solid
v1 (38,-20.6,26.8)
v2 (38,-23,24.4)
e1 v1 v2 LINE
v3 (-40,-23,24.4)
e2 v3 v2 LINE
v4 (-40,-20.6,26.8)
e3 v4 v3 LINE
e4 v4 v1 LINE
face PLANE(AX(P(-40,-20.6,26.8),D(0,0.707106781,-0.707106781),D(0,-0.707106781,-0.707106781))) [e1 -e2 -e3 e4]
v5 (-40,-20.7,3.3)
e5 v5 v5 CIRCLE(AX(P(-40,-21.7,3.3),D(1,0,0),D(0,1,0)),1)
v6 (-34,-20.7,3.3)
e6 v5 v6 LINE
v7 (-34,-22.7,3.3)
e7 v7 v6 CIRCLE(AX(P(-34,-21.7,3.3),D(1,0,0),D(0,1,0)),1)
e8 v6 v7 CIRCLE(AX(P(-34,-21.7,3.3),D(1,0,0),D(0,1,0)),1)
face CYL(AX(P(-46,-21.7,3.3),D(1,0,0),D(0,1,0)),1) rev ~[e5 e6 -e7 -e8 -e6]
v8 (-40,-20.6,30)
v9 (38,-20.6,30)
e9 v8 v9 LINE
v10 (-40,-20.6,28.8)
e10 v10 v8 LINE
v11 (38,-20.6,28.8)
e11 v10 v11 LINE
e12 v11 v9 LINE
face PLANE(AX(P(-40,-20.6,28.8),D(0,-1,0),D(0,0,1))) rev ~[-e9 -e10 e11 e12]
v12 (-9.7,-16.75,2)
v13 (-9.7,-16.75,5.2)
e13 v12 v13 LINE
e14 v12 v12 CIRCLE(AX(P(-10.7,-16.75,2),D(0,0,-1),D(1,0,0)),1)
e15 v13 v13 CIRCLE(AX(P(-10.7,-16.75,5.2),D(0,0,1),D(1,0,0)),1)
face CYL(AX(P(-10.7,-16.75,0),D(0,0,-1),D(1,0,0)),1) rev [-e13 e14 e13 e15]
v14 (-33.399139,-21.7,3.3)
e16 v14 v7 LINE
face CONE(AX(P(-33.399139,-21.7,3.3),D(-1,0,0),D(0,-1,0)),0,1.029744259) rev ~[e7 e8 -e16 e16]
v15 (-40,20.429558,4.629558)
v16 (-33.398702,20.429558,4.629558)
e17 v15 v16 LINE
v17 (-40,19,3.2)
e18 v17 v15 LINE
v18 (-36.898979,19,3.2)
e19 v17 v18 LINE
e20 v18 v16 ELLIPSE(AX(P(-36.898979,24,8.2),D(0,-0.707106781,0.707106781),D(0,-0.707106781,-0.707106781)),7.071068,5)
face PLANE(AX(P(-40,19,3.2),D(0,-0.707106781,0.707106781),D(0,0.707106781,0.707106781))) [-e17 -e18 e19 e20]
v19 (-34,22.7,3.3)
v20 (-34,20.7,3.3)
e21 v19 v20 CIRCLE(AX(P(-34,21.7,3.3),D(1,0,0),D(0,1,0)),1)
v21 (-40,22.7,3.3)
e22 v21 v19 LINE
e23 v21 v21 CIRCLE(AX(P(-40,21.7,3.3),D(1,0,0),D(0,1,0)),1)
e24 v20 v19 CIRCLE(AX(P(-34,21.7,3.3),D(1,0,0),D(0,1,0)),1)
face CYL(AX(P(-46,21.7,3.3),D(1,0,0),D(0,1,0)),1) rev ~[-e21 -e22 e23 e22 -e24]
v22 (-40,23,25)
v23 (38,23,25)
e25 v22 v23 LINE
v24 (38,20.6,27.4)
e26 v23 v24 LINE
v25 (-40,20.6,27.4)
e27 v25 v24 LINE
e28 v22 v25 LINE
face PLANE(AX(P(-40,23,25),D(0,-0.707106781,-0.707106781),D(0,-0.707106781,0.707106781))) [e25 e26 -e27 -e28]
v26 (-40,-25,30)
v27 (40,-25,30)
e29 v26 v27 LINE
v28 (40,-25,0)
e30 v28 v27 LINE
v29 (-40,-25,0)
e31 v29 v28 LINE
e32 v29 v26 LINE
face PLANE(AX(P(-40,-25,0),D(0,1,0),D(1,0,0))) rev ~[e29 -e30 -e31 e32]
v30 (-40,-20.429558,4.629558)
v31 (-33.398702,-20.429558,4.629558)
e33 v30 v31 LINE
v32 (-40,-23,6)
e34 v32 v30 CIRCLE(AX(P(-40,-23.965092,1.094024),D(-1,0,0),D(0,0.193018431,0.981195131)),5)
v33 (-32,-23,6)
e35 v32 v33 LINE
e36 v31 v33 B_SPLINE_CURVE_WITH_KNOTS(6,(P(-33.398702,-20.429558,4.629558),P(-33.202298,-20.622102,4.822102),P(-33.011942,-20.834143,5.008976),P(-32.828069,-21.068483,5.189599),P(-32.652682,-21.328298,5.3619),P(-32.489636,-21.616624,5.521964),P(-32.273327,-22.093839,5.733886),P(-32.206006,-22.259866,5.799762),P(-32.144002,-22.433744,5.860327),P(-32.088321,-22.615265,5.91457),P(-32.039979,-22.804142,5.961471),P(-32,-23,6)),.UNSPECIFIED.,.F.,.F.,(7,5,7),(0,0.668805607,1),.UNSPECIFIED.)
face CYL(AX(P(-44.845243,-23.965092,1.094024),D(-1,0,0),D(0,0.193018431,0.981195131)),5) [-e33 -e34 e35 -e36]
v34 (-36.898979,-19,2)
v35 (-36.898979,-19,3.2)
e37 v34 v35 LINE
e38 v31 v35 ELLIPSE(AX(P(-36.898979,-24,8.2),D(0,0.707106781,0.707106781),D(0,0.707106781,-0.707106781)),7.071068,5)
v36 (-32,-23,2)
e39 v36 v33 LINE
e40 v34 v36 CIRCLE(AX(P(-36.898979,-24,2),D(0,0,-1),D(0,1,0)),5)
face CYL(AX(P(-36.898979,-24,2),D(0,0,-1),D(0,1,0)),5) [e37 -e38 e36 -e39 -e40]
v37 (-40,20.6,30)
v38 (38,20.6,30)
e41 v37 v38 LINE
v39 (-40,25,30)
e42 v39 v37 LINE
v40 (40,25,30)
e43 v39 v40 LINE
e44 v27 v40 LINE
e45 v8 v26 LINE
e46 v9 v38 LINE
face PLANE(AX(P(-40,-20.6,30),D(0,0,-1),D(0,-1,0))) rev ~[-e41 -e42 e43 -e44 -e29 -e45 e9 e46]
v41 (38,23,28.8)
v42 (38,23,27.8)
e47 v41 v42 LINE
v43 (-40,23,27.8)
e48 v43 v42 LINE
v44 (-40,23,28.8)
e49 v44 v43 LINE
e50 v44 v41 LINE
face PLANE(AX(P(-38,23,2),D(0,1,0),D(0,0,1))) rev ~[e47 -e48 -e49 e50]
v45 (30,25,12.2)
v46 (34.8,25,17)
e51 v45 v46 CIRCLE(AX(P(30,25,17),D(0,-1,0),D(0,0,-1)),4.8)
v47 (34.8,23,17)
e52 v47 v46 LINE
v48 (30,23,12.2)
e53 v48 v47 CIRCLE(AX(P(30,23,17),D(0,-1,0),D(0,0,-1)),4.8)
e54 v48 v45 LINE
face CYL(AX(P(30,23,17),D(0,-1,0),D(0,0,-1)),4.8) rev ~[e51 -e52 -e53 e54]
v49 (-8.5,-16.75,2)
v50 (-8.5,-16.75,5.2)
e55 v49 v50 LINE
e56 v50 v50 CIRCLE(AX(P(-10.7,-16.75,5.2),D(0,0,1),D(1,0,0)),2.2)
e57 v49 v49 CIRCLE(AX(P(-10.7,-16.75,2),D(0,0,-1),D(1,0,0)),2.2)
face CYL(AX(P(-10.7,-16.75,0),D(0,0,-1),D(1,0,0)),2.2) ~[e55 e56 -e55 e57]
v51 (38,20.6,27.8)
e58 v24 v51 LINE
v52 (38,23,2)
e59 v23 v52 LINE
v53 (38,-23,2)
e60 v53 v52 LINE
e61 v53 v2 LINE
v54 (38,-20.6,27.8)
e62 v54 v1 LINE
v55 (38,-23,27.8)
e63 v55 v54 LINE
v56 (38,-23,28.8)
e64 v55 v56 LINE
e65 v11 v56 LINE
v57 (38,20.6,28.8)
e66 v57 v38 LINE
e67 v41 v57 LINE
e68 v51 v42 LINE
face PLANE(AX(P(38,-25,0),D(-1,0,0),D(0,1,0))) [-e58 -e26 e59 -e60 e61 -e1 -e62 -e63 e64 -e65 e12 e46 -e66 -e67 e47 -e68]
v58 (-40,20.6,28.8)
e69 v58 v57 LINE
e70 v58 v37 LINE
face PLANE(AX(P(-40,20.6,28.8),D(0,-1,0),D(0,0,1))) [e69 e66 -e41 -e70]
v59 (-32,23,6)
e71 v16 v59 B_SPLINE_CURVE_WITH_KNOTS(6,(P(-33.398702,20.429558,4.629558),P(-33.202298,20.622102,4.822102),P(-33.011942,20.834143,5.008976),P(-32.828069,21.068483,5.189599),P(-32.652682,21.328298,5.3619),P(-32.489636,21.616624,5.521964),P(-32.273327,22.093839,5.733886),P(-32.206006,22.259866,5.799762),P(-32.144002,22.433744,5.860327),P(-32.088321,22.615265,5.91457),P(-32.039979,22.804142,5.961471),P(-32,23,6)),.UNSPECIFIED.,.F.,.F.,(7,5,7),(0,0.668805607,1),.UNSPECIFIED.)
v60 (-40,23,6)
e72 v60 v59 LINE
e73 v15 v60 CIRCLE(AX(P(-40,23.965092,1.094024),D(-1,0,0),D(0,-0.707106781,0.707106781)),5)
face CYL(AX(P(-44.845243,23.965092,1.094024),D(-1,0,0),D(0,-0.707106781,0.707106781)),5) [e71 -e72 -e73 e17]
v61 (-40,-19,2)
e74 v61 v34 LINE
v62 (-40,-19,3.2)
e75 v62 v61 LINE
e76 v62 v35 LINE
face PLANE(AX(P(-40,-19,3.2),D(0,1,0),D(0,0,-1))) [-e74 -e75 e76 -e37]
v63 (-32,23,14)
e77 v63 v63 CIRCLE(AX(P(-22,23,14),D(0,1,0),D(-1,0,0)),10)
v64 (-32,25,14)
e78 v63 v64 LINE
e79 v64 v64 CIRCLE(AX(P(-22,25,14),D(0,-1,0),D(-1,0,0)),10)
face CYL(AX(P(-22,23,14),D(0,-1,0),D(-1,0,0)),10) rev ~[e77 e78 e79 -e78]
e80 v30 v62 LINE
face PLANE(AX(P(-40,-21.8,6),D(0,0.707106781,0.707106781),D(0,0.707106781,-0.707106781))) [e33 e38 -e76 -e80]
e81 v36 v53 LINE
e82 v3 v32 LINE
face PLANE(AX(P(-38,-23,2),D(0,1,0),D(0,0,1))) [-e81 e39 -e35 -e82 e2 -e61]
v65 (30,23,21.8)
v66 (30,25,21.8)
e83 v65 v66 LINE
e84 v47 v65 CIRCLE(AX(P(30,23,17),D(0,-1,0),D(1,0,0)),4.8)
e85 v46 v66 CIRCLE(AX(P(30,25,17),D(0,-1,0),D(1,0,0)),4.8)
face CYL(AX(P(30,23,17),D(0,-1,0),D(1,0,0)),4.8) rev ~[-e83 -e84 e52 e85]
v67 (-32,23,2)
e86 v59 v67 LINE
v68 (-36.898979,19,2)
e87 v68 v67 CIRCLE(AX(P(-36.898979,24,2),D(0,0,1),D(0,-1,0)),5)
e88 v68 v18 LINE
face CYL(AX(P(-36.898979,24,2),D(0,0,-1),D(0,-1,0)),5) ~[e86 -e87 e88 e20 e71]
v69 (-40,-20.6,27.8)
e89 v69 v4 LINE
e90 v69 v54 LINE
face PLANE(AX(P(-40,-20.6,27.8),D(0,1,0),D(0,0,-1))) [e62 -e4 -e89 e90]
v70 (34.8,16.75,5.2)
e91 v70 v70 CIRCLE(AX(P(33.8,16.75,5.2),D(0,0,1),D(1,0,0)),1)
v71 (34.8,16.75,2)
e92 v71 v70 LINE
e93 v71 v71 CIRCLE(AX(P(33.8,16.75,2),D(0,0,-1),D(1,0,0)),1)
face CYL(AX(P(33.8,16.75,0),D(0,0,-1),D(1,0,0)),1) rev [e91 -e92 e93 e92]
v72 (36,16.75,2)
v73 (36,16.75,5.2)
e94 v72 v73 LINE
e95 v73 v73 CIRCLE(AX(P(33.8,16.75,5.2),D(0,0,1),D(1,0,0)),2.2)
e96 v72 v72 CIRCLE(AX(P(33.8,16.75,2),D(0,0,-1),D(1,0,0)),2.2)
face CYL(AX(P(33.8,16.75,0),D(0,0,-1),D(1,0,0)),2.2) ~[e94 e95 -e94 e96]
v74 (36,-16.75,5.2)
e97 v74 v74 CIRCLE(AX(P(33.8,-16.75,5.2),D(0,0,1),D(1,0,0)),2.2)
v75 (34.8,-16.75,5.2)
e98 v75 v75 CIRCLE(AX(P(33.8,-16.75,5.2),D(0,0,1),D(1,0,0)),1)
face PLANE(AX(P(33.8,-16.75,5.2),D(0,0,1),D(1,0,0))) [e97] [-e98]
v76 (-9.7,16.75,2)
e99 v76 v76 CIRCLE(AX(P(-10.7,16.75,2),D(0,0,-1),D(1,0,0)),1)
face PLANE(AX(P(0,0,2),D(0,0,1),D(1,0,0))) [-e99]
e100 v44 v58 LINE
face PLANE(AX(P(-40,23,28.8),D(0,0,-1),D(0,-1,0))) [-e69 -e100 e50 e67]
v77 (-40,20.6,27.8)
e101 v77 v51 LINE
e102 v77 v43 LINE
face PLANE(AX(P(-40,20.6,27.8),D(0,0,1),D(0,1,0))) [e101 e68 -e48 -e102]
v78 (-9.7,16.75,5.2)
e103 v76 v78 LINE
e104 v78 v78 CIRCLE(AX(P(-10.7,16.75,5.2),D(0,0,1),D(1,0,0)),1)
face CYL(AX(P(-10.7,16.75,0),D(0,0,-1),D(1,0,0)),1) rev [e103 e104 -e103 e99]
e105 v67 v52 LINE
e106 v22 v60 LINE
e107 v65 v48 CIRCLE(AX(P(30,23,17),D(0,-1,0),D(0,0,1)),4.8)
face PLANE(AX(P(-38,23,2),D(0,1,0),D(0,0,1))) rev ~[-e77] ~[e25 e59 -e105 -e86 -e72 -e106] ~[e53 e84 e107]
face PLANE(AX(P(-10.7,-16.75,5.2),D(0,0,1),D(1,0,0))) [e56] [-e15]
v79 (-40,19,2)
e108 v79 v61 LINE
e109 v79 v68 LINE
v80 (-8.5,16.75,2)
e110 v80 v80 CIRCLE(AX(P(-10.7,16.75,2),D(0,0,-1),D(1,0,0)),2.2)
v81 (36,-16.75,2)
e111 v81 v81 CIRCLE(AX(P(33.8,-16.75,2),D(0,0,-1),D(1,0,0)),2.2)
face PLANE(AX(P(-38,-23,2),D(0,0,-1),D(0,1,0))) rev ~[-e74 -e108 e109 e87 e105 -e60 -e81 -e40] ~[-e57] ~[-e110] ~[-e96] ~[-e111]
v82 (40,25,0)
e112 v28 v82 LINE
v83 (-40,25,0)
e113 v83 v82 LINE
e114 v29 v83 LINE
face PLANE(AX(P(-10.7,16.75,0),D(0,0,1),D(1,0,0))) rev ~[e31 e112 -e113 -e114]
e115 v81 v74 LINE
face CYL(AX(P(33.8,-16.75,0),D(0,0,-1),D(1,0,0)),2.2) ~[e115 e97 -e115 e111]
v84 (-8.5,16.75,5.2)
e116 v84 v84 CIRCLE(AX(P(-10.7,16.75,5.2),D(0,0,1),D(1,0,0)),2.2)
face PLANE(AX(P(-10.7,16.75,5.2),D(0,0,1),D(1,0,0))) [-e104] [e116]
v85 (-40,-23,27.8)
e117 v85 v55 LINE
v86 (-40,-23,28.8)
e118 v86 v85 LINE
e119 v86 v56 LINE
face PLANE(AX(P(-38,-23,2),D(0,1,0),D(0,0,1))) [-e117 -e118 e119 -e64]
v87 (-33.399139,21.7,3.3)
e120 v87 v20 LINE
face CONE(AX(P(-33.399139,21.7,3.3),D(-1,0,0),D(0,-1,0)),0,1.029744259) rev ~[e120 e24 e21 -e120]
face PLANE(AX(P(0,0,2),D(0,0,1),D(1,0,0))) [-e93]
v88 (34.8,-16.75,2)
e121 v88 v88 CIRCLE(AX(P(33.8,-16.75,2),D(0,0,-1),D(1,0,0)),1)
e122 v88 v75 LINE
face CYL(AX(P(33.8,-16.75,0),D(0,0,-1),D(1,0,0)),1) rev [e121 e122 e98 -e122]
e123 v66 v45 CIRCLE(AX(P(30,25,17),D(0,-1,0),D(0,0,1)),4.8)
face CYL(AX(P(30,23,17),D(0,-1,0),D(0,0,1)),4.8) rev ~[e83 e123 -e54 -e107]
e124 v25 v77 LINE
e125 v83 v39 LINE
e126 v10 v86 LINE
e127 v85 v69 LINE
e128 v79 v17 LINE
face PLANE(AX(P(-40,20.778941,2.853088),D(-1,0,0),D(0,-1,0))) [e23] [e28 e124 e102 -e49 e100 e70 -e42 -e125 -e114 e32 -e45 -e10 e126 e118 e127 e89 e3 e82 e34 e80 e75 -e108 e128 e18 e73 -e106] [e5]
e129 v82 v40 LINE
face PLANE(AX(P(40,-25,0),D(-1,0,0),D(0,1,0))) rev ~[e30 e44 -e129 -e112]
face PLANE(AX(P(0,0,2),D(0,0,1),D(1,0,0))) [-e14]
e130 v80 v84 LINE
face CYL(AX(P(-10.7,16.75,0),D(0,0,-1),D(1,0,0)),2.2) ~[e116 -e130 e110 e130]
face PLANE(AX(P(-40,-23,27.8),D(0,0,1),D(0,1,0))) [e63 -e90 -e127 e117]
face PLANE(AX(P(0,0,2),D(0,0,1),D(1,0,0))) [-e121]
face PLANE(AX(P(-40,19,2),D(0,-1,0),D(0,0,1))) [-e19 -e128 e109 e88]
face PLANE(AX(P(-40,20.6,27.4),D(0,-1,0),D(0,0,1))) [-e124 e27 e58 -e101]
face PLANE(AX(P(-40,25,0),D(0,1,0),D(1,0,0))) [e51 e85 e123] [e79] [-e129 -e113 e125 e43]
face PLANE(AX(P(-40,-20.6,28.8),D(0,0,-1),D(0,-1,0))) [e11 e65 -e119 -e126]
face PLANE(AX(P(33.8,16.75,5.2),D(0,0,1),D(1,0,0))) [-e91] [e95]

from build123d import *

# Parameters (mm, degrees)
F0_W         = 80
F0_H         = 50
F1_DEPTH     = 30
F2_T         = -2
F3_R         = 2.2
F3_R_2       = 1
F4_DEPTH     = 5.2
F5_W         = 46
F5_H         = 28
F6_DEPTH     = 25
F7_W         = 2.4
F7_H         = 1.2
F8_DEPTH     = 78
F10_DEPTH    = 8
F11_T1_DEPTH = 13.4474487139
F11_T3_DEPTH = 17.690486541
F12_D        = 2
F12_DEPTH    = 6
F12_TIP      = 0.600860619
F14_DEPTH    = 25


# Not quite as in the source:
# - a fillet or chamfer that OpenCascade refuses, or shapes differently, is made with other operations: its cross-section is extruded or revolved along the edge and cut away or added


with BuildPart() as f1:
    # F0 (on Top) → F1 (new body)
    with BuildSketch(Plane.XY):
        Rectangle(F0_W, F0_H)
    extrude(amount=F1_DEPTH)

    # F2
    f2_openings = [f1.faces().sort_by_distance(p)[0] for p in [
        (0, 0, 30),
    ]]
    offset(amount=F2_T, openings=f2_openings)

    # F3 (on face) → F4 (join)
    with BuildSketch(Plane.XY):
        with Locations((-10.7, 16.75)):
            Circle(F3_R)
        with Locations((-10.7, 16.75)):
            Circle(F3_R_2, mode=Mode.SUBTRACT)
        with Locations((-10.7, -16.75)):
            Circle(F3_R)
        with Locations((-10.7, -16.75)):
            Circle(F3_R_2, mode=Mode.SUBTRACT)
        with Locations((33.8, 16.75)):
            Circle(F3_R)
        with Locations((33.8, 16.75)):
            Circle(F3_R_2, mode=Mode.SUBTRACT)
        with Locations((33.8, -16.75)):
            Circle(F3_R)
        with Locations((33.8, -16.75)):
            Circle(F3_R_2, mode=Mode.SUBTRACT)
    extrude(amount=F4_DEPTH)

    # F5 (on face) → F6 (cut)
    with BuildSketch(Plane.YZ.offset(-38)):
        with Locations((0, 16)):
            Rectangle(F5_W, F5_H)
    extrude(amount=-F6_DEPTH, mode=Mode.SUBTRACT)

    # F7 (on face) → F8 (join, through all)
    with BuildSketch(Plane(origin=(-40, 0, 0), x_dir=(0, -1, 0), z_dir=(-1, 0, 0))):
        Polygon((-20.6, 27.8), (-23, 27.8), (-23, 25), (-20.6, 27.4), align=None)
        Polygon((20.6, 26.8), (23, 24.4), (23, 27.8), (20.6, 27.8), align=None)
        with Locations((21.8, 29.4)):
            Rectangle(F7_W, F7_H)
        with Locations((-21.8, 29.4)):
            Rectangle(F7_W, F7_H)
    extrude(amount=-F8_DEPTH)

    # F9 (on face) → F10 (join)
    with BuildSketch(Plane(origin=(-40, 0, 0), x_dir=(0, -1, 0), z_dir=(-1, 0, 0))):
        Polygon((-21.7, 3.3), (-23, 2), (-19, 2), (-19, 3.2), (-20.4, 4.6), align=None)
        Polygon((-23, 6), (-23, 2), (-21.7, 3.3), (-20.4, 4.6), (-21.8, 6), align=None)
        Polygon((19, 2), (23, 2), (23, 6), (21.8, 6), (19, 3.2), align=None)
    extrude(amount=-F10_DEPTH)

    # F11: fillet of radius 5 on 4 edges, made by hand

    # F11_s2 → F11_t1 (cut)
    with BuildSketch(Plane.XY.offset(2)):
        with BuildLine():
            ThreePointArc((-36.8989794856, 19), (-33.7367018254, 20.1270166538), (-32, 23))
            Line((-32, 23), (-32, 19))
            Line((-32, 19), (-36.8989794856, 19))
        make_face()
        with BuildLine():
            ThreePointArc((-36.8989794856, -19), (-33.7367018254, -20.1270166538), (-32, -23))
            Line((-32, -23), (-32, -19))
            Line((-32, -19), (-36.8989794856, -19))
        make_face()
    extrude(amount=F11_T1_DEPTH, mode=Mode.SUBTRACT)

    # F11_s4 → F11_t3 (cut)
    with BuildSketch(Plane.YZ.offset(-44.8452432705)):
        with BuildLine():
            ThreePointArc((-23, 6), (-21.6127664169, 5.5061172285), (-20.4295582508, 4.6295582508))
            Line((-20.4295582508, 4.6295582508), (-21.8, 6))
            Line((-21.8, 6), (-23, 6))
        make_face()
        with BuildLine():
            ThreePointArc((20.4295582508, 4.6295582508), (21.6127664169, 5.5061172285), (23, 6))
            Line((23, 6), (21.8, 6))
            Line((21.8, 6), (20.4295582508, 4.6295582508))
        make_face()
    extrude(amount=F11_T3_DEPTH, mode=Mode.SUBTRACT)

    # F12
    with Locations(Plane(origin=(-40, 0, 0), x_dir=(0, -1, 0), z_dir=(-1, 0, 0))):
        with Locations((-21.7, 3.3), (21.7, 3.3)):
            Hole(F12_D / 2, depth=F12_DEPTH)
            with Locations((0, 0, -(F12_DEPTH + F12_TIP / 2))):  # 118° drill point
                Cone(0, F12_D / 2, F12_TIP, mode=Mode.SUBTRACT)

    # F13 (on face) → F14 (cut)
    with BuildSketch(Plane.XZ.offset(-23)):
        with BuildLine():
            ThreePointArc((-28, 6), (-17.527864045, 5.05572809), (-12, 14))
            ThreePointArc((-12, 14), (-22, 24), (-32, 14))
            ThreePointArc((-32, 14), (-30.94427191, 9.527864045), (-28, 6))
        make_face()
        with BuildLine():
            ThreePointArc((30, 21.8), (25.2, 17), (30, 12.2))
            Line((30, 12.2), (30, 17))
            Line((30, 17), (30, 21.8))
        make_face()
        with BuildLine():
            ThreePointArc((34.8, 17), (33.3941125497, 20.3941125497), (30, 21.8))
            Line((30, 21.8), (30, 17))
            Line((30, 17), (34.8, 17))
        make_face()
        with BuildLine():
            Line((30, 17), (30, 12.2))
            ThreePointArc((30, 12.2), (33.3941125497, 13.6058874503), (34.8, 17))
            Line((34.8, 17), (30, 17))
        make_face()
    extrude(amount=-F14_DEPTH, mode=Mode.SUBTRACT)


solid = f1.part
